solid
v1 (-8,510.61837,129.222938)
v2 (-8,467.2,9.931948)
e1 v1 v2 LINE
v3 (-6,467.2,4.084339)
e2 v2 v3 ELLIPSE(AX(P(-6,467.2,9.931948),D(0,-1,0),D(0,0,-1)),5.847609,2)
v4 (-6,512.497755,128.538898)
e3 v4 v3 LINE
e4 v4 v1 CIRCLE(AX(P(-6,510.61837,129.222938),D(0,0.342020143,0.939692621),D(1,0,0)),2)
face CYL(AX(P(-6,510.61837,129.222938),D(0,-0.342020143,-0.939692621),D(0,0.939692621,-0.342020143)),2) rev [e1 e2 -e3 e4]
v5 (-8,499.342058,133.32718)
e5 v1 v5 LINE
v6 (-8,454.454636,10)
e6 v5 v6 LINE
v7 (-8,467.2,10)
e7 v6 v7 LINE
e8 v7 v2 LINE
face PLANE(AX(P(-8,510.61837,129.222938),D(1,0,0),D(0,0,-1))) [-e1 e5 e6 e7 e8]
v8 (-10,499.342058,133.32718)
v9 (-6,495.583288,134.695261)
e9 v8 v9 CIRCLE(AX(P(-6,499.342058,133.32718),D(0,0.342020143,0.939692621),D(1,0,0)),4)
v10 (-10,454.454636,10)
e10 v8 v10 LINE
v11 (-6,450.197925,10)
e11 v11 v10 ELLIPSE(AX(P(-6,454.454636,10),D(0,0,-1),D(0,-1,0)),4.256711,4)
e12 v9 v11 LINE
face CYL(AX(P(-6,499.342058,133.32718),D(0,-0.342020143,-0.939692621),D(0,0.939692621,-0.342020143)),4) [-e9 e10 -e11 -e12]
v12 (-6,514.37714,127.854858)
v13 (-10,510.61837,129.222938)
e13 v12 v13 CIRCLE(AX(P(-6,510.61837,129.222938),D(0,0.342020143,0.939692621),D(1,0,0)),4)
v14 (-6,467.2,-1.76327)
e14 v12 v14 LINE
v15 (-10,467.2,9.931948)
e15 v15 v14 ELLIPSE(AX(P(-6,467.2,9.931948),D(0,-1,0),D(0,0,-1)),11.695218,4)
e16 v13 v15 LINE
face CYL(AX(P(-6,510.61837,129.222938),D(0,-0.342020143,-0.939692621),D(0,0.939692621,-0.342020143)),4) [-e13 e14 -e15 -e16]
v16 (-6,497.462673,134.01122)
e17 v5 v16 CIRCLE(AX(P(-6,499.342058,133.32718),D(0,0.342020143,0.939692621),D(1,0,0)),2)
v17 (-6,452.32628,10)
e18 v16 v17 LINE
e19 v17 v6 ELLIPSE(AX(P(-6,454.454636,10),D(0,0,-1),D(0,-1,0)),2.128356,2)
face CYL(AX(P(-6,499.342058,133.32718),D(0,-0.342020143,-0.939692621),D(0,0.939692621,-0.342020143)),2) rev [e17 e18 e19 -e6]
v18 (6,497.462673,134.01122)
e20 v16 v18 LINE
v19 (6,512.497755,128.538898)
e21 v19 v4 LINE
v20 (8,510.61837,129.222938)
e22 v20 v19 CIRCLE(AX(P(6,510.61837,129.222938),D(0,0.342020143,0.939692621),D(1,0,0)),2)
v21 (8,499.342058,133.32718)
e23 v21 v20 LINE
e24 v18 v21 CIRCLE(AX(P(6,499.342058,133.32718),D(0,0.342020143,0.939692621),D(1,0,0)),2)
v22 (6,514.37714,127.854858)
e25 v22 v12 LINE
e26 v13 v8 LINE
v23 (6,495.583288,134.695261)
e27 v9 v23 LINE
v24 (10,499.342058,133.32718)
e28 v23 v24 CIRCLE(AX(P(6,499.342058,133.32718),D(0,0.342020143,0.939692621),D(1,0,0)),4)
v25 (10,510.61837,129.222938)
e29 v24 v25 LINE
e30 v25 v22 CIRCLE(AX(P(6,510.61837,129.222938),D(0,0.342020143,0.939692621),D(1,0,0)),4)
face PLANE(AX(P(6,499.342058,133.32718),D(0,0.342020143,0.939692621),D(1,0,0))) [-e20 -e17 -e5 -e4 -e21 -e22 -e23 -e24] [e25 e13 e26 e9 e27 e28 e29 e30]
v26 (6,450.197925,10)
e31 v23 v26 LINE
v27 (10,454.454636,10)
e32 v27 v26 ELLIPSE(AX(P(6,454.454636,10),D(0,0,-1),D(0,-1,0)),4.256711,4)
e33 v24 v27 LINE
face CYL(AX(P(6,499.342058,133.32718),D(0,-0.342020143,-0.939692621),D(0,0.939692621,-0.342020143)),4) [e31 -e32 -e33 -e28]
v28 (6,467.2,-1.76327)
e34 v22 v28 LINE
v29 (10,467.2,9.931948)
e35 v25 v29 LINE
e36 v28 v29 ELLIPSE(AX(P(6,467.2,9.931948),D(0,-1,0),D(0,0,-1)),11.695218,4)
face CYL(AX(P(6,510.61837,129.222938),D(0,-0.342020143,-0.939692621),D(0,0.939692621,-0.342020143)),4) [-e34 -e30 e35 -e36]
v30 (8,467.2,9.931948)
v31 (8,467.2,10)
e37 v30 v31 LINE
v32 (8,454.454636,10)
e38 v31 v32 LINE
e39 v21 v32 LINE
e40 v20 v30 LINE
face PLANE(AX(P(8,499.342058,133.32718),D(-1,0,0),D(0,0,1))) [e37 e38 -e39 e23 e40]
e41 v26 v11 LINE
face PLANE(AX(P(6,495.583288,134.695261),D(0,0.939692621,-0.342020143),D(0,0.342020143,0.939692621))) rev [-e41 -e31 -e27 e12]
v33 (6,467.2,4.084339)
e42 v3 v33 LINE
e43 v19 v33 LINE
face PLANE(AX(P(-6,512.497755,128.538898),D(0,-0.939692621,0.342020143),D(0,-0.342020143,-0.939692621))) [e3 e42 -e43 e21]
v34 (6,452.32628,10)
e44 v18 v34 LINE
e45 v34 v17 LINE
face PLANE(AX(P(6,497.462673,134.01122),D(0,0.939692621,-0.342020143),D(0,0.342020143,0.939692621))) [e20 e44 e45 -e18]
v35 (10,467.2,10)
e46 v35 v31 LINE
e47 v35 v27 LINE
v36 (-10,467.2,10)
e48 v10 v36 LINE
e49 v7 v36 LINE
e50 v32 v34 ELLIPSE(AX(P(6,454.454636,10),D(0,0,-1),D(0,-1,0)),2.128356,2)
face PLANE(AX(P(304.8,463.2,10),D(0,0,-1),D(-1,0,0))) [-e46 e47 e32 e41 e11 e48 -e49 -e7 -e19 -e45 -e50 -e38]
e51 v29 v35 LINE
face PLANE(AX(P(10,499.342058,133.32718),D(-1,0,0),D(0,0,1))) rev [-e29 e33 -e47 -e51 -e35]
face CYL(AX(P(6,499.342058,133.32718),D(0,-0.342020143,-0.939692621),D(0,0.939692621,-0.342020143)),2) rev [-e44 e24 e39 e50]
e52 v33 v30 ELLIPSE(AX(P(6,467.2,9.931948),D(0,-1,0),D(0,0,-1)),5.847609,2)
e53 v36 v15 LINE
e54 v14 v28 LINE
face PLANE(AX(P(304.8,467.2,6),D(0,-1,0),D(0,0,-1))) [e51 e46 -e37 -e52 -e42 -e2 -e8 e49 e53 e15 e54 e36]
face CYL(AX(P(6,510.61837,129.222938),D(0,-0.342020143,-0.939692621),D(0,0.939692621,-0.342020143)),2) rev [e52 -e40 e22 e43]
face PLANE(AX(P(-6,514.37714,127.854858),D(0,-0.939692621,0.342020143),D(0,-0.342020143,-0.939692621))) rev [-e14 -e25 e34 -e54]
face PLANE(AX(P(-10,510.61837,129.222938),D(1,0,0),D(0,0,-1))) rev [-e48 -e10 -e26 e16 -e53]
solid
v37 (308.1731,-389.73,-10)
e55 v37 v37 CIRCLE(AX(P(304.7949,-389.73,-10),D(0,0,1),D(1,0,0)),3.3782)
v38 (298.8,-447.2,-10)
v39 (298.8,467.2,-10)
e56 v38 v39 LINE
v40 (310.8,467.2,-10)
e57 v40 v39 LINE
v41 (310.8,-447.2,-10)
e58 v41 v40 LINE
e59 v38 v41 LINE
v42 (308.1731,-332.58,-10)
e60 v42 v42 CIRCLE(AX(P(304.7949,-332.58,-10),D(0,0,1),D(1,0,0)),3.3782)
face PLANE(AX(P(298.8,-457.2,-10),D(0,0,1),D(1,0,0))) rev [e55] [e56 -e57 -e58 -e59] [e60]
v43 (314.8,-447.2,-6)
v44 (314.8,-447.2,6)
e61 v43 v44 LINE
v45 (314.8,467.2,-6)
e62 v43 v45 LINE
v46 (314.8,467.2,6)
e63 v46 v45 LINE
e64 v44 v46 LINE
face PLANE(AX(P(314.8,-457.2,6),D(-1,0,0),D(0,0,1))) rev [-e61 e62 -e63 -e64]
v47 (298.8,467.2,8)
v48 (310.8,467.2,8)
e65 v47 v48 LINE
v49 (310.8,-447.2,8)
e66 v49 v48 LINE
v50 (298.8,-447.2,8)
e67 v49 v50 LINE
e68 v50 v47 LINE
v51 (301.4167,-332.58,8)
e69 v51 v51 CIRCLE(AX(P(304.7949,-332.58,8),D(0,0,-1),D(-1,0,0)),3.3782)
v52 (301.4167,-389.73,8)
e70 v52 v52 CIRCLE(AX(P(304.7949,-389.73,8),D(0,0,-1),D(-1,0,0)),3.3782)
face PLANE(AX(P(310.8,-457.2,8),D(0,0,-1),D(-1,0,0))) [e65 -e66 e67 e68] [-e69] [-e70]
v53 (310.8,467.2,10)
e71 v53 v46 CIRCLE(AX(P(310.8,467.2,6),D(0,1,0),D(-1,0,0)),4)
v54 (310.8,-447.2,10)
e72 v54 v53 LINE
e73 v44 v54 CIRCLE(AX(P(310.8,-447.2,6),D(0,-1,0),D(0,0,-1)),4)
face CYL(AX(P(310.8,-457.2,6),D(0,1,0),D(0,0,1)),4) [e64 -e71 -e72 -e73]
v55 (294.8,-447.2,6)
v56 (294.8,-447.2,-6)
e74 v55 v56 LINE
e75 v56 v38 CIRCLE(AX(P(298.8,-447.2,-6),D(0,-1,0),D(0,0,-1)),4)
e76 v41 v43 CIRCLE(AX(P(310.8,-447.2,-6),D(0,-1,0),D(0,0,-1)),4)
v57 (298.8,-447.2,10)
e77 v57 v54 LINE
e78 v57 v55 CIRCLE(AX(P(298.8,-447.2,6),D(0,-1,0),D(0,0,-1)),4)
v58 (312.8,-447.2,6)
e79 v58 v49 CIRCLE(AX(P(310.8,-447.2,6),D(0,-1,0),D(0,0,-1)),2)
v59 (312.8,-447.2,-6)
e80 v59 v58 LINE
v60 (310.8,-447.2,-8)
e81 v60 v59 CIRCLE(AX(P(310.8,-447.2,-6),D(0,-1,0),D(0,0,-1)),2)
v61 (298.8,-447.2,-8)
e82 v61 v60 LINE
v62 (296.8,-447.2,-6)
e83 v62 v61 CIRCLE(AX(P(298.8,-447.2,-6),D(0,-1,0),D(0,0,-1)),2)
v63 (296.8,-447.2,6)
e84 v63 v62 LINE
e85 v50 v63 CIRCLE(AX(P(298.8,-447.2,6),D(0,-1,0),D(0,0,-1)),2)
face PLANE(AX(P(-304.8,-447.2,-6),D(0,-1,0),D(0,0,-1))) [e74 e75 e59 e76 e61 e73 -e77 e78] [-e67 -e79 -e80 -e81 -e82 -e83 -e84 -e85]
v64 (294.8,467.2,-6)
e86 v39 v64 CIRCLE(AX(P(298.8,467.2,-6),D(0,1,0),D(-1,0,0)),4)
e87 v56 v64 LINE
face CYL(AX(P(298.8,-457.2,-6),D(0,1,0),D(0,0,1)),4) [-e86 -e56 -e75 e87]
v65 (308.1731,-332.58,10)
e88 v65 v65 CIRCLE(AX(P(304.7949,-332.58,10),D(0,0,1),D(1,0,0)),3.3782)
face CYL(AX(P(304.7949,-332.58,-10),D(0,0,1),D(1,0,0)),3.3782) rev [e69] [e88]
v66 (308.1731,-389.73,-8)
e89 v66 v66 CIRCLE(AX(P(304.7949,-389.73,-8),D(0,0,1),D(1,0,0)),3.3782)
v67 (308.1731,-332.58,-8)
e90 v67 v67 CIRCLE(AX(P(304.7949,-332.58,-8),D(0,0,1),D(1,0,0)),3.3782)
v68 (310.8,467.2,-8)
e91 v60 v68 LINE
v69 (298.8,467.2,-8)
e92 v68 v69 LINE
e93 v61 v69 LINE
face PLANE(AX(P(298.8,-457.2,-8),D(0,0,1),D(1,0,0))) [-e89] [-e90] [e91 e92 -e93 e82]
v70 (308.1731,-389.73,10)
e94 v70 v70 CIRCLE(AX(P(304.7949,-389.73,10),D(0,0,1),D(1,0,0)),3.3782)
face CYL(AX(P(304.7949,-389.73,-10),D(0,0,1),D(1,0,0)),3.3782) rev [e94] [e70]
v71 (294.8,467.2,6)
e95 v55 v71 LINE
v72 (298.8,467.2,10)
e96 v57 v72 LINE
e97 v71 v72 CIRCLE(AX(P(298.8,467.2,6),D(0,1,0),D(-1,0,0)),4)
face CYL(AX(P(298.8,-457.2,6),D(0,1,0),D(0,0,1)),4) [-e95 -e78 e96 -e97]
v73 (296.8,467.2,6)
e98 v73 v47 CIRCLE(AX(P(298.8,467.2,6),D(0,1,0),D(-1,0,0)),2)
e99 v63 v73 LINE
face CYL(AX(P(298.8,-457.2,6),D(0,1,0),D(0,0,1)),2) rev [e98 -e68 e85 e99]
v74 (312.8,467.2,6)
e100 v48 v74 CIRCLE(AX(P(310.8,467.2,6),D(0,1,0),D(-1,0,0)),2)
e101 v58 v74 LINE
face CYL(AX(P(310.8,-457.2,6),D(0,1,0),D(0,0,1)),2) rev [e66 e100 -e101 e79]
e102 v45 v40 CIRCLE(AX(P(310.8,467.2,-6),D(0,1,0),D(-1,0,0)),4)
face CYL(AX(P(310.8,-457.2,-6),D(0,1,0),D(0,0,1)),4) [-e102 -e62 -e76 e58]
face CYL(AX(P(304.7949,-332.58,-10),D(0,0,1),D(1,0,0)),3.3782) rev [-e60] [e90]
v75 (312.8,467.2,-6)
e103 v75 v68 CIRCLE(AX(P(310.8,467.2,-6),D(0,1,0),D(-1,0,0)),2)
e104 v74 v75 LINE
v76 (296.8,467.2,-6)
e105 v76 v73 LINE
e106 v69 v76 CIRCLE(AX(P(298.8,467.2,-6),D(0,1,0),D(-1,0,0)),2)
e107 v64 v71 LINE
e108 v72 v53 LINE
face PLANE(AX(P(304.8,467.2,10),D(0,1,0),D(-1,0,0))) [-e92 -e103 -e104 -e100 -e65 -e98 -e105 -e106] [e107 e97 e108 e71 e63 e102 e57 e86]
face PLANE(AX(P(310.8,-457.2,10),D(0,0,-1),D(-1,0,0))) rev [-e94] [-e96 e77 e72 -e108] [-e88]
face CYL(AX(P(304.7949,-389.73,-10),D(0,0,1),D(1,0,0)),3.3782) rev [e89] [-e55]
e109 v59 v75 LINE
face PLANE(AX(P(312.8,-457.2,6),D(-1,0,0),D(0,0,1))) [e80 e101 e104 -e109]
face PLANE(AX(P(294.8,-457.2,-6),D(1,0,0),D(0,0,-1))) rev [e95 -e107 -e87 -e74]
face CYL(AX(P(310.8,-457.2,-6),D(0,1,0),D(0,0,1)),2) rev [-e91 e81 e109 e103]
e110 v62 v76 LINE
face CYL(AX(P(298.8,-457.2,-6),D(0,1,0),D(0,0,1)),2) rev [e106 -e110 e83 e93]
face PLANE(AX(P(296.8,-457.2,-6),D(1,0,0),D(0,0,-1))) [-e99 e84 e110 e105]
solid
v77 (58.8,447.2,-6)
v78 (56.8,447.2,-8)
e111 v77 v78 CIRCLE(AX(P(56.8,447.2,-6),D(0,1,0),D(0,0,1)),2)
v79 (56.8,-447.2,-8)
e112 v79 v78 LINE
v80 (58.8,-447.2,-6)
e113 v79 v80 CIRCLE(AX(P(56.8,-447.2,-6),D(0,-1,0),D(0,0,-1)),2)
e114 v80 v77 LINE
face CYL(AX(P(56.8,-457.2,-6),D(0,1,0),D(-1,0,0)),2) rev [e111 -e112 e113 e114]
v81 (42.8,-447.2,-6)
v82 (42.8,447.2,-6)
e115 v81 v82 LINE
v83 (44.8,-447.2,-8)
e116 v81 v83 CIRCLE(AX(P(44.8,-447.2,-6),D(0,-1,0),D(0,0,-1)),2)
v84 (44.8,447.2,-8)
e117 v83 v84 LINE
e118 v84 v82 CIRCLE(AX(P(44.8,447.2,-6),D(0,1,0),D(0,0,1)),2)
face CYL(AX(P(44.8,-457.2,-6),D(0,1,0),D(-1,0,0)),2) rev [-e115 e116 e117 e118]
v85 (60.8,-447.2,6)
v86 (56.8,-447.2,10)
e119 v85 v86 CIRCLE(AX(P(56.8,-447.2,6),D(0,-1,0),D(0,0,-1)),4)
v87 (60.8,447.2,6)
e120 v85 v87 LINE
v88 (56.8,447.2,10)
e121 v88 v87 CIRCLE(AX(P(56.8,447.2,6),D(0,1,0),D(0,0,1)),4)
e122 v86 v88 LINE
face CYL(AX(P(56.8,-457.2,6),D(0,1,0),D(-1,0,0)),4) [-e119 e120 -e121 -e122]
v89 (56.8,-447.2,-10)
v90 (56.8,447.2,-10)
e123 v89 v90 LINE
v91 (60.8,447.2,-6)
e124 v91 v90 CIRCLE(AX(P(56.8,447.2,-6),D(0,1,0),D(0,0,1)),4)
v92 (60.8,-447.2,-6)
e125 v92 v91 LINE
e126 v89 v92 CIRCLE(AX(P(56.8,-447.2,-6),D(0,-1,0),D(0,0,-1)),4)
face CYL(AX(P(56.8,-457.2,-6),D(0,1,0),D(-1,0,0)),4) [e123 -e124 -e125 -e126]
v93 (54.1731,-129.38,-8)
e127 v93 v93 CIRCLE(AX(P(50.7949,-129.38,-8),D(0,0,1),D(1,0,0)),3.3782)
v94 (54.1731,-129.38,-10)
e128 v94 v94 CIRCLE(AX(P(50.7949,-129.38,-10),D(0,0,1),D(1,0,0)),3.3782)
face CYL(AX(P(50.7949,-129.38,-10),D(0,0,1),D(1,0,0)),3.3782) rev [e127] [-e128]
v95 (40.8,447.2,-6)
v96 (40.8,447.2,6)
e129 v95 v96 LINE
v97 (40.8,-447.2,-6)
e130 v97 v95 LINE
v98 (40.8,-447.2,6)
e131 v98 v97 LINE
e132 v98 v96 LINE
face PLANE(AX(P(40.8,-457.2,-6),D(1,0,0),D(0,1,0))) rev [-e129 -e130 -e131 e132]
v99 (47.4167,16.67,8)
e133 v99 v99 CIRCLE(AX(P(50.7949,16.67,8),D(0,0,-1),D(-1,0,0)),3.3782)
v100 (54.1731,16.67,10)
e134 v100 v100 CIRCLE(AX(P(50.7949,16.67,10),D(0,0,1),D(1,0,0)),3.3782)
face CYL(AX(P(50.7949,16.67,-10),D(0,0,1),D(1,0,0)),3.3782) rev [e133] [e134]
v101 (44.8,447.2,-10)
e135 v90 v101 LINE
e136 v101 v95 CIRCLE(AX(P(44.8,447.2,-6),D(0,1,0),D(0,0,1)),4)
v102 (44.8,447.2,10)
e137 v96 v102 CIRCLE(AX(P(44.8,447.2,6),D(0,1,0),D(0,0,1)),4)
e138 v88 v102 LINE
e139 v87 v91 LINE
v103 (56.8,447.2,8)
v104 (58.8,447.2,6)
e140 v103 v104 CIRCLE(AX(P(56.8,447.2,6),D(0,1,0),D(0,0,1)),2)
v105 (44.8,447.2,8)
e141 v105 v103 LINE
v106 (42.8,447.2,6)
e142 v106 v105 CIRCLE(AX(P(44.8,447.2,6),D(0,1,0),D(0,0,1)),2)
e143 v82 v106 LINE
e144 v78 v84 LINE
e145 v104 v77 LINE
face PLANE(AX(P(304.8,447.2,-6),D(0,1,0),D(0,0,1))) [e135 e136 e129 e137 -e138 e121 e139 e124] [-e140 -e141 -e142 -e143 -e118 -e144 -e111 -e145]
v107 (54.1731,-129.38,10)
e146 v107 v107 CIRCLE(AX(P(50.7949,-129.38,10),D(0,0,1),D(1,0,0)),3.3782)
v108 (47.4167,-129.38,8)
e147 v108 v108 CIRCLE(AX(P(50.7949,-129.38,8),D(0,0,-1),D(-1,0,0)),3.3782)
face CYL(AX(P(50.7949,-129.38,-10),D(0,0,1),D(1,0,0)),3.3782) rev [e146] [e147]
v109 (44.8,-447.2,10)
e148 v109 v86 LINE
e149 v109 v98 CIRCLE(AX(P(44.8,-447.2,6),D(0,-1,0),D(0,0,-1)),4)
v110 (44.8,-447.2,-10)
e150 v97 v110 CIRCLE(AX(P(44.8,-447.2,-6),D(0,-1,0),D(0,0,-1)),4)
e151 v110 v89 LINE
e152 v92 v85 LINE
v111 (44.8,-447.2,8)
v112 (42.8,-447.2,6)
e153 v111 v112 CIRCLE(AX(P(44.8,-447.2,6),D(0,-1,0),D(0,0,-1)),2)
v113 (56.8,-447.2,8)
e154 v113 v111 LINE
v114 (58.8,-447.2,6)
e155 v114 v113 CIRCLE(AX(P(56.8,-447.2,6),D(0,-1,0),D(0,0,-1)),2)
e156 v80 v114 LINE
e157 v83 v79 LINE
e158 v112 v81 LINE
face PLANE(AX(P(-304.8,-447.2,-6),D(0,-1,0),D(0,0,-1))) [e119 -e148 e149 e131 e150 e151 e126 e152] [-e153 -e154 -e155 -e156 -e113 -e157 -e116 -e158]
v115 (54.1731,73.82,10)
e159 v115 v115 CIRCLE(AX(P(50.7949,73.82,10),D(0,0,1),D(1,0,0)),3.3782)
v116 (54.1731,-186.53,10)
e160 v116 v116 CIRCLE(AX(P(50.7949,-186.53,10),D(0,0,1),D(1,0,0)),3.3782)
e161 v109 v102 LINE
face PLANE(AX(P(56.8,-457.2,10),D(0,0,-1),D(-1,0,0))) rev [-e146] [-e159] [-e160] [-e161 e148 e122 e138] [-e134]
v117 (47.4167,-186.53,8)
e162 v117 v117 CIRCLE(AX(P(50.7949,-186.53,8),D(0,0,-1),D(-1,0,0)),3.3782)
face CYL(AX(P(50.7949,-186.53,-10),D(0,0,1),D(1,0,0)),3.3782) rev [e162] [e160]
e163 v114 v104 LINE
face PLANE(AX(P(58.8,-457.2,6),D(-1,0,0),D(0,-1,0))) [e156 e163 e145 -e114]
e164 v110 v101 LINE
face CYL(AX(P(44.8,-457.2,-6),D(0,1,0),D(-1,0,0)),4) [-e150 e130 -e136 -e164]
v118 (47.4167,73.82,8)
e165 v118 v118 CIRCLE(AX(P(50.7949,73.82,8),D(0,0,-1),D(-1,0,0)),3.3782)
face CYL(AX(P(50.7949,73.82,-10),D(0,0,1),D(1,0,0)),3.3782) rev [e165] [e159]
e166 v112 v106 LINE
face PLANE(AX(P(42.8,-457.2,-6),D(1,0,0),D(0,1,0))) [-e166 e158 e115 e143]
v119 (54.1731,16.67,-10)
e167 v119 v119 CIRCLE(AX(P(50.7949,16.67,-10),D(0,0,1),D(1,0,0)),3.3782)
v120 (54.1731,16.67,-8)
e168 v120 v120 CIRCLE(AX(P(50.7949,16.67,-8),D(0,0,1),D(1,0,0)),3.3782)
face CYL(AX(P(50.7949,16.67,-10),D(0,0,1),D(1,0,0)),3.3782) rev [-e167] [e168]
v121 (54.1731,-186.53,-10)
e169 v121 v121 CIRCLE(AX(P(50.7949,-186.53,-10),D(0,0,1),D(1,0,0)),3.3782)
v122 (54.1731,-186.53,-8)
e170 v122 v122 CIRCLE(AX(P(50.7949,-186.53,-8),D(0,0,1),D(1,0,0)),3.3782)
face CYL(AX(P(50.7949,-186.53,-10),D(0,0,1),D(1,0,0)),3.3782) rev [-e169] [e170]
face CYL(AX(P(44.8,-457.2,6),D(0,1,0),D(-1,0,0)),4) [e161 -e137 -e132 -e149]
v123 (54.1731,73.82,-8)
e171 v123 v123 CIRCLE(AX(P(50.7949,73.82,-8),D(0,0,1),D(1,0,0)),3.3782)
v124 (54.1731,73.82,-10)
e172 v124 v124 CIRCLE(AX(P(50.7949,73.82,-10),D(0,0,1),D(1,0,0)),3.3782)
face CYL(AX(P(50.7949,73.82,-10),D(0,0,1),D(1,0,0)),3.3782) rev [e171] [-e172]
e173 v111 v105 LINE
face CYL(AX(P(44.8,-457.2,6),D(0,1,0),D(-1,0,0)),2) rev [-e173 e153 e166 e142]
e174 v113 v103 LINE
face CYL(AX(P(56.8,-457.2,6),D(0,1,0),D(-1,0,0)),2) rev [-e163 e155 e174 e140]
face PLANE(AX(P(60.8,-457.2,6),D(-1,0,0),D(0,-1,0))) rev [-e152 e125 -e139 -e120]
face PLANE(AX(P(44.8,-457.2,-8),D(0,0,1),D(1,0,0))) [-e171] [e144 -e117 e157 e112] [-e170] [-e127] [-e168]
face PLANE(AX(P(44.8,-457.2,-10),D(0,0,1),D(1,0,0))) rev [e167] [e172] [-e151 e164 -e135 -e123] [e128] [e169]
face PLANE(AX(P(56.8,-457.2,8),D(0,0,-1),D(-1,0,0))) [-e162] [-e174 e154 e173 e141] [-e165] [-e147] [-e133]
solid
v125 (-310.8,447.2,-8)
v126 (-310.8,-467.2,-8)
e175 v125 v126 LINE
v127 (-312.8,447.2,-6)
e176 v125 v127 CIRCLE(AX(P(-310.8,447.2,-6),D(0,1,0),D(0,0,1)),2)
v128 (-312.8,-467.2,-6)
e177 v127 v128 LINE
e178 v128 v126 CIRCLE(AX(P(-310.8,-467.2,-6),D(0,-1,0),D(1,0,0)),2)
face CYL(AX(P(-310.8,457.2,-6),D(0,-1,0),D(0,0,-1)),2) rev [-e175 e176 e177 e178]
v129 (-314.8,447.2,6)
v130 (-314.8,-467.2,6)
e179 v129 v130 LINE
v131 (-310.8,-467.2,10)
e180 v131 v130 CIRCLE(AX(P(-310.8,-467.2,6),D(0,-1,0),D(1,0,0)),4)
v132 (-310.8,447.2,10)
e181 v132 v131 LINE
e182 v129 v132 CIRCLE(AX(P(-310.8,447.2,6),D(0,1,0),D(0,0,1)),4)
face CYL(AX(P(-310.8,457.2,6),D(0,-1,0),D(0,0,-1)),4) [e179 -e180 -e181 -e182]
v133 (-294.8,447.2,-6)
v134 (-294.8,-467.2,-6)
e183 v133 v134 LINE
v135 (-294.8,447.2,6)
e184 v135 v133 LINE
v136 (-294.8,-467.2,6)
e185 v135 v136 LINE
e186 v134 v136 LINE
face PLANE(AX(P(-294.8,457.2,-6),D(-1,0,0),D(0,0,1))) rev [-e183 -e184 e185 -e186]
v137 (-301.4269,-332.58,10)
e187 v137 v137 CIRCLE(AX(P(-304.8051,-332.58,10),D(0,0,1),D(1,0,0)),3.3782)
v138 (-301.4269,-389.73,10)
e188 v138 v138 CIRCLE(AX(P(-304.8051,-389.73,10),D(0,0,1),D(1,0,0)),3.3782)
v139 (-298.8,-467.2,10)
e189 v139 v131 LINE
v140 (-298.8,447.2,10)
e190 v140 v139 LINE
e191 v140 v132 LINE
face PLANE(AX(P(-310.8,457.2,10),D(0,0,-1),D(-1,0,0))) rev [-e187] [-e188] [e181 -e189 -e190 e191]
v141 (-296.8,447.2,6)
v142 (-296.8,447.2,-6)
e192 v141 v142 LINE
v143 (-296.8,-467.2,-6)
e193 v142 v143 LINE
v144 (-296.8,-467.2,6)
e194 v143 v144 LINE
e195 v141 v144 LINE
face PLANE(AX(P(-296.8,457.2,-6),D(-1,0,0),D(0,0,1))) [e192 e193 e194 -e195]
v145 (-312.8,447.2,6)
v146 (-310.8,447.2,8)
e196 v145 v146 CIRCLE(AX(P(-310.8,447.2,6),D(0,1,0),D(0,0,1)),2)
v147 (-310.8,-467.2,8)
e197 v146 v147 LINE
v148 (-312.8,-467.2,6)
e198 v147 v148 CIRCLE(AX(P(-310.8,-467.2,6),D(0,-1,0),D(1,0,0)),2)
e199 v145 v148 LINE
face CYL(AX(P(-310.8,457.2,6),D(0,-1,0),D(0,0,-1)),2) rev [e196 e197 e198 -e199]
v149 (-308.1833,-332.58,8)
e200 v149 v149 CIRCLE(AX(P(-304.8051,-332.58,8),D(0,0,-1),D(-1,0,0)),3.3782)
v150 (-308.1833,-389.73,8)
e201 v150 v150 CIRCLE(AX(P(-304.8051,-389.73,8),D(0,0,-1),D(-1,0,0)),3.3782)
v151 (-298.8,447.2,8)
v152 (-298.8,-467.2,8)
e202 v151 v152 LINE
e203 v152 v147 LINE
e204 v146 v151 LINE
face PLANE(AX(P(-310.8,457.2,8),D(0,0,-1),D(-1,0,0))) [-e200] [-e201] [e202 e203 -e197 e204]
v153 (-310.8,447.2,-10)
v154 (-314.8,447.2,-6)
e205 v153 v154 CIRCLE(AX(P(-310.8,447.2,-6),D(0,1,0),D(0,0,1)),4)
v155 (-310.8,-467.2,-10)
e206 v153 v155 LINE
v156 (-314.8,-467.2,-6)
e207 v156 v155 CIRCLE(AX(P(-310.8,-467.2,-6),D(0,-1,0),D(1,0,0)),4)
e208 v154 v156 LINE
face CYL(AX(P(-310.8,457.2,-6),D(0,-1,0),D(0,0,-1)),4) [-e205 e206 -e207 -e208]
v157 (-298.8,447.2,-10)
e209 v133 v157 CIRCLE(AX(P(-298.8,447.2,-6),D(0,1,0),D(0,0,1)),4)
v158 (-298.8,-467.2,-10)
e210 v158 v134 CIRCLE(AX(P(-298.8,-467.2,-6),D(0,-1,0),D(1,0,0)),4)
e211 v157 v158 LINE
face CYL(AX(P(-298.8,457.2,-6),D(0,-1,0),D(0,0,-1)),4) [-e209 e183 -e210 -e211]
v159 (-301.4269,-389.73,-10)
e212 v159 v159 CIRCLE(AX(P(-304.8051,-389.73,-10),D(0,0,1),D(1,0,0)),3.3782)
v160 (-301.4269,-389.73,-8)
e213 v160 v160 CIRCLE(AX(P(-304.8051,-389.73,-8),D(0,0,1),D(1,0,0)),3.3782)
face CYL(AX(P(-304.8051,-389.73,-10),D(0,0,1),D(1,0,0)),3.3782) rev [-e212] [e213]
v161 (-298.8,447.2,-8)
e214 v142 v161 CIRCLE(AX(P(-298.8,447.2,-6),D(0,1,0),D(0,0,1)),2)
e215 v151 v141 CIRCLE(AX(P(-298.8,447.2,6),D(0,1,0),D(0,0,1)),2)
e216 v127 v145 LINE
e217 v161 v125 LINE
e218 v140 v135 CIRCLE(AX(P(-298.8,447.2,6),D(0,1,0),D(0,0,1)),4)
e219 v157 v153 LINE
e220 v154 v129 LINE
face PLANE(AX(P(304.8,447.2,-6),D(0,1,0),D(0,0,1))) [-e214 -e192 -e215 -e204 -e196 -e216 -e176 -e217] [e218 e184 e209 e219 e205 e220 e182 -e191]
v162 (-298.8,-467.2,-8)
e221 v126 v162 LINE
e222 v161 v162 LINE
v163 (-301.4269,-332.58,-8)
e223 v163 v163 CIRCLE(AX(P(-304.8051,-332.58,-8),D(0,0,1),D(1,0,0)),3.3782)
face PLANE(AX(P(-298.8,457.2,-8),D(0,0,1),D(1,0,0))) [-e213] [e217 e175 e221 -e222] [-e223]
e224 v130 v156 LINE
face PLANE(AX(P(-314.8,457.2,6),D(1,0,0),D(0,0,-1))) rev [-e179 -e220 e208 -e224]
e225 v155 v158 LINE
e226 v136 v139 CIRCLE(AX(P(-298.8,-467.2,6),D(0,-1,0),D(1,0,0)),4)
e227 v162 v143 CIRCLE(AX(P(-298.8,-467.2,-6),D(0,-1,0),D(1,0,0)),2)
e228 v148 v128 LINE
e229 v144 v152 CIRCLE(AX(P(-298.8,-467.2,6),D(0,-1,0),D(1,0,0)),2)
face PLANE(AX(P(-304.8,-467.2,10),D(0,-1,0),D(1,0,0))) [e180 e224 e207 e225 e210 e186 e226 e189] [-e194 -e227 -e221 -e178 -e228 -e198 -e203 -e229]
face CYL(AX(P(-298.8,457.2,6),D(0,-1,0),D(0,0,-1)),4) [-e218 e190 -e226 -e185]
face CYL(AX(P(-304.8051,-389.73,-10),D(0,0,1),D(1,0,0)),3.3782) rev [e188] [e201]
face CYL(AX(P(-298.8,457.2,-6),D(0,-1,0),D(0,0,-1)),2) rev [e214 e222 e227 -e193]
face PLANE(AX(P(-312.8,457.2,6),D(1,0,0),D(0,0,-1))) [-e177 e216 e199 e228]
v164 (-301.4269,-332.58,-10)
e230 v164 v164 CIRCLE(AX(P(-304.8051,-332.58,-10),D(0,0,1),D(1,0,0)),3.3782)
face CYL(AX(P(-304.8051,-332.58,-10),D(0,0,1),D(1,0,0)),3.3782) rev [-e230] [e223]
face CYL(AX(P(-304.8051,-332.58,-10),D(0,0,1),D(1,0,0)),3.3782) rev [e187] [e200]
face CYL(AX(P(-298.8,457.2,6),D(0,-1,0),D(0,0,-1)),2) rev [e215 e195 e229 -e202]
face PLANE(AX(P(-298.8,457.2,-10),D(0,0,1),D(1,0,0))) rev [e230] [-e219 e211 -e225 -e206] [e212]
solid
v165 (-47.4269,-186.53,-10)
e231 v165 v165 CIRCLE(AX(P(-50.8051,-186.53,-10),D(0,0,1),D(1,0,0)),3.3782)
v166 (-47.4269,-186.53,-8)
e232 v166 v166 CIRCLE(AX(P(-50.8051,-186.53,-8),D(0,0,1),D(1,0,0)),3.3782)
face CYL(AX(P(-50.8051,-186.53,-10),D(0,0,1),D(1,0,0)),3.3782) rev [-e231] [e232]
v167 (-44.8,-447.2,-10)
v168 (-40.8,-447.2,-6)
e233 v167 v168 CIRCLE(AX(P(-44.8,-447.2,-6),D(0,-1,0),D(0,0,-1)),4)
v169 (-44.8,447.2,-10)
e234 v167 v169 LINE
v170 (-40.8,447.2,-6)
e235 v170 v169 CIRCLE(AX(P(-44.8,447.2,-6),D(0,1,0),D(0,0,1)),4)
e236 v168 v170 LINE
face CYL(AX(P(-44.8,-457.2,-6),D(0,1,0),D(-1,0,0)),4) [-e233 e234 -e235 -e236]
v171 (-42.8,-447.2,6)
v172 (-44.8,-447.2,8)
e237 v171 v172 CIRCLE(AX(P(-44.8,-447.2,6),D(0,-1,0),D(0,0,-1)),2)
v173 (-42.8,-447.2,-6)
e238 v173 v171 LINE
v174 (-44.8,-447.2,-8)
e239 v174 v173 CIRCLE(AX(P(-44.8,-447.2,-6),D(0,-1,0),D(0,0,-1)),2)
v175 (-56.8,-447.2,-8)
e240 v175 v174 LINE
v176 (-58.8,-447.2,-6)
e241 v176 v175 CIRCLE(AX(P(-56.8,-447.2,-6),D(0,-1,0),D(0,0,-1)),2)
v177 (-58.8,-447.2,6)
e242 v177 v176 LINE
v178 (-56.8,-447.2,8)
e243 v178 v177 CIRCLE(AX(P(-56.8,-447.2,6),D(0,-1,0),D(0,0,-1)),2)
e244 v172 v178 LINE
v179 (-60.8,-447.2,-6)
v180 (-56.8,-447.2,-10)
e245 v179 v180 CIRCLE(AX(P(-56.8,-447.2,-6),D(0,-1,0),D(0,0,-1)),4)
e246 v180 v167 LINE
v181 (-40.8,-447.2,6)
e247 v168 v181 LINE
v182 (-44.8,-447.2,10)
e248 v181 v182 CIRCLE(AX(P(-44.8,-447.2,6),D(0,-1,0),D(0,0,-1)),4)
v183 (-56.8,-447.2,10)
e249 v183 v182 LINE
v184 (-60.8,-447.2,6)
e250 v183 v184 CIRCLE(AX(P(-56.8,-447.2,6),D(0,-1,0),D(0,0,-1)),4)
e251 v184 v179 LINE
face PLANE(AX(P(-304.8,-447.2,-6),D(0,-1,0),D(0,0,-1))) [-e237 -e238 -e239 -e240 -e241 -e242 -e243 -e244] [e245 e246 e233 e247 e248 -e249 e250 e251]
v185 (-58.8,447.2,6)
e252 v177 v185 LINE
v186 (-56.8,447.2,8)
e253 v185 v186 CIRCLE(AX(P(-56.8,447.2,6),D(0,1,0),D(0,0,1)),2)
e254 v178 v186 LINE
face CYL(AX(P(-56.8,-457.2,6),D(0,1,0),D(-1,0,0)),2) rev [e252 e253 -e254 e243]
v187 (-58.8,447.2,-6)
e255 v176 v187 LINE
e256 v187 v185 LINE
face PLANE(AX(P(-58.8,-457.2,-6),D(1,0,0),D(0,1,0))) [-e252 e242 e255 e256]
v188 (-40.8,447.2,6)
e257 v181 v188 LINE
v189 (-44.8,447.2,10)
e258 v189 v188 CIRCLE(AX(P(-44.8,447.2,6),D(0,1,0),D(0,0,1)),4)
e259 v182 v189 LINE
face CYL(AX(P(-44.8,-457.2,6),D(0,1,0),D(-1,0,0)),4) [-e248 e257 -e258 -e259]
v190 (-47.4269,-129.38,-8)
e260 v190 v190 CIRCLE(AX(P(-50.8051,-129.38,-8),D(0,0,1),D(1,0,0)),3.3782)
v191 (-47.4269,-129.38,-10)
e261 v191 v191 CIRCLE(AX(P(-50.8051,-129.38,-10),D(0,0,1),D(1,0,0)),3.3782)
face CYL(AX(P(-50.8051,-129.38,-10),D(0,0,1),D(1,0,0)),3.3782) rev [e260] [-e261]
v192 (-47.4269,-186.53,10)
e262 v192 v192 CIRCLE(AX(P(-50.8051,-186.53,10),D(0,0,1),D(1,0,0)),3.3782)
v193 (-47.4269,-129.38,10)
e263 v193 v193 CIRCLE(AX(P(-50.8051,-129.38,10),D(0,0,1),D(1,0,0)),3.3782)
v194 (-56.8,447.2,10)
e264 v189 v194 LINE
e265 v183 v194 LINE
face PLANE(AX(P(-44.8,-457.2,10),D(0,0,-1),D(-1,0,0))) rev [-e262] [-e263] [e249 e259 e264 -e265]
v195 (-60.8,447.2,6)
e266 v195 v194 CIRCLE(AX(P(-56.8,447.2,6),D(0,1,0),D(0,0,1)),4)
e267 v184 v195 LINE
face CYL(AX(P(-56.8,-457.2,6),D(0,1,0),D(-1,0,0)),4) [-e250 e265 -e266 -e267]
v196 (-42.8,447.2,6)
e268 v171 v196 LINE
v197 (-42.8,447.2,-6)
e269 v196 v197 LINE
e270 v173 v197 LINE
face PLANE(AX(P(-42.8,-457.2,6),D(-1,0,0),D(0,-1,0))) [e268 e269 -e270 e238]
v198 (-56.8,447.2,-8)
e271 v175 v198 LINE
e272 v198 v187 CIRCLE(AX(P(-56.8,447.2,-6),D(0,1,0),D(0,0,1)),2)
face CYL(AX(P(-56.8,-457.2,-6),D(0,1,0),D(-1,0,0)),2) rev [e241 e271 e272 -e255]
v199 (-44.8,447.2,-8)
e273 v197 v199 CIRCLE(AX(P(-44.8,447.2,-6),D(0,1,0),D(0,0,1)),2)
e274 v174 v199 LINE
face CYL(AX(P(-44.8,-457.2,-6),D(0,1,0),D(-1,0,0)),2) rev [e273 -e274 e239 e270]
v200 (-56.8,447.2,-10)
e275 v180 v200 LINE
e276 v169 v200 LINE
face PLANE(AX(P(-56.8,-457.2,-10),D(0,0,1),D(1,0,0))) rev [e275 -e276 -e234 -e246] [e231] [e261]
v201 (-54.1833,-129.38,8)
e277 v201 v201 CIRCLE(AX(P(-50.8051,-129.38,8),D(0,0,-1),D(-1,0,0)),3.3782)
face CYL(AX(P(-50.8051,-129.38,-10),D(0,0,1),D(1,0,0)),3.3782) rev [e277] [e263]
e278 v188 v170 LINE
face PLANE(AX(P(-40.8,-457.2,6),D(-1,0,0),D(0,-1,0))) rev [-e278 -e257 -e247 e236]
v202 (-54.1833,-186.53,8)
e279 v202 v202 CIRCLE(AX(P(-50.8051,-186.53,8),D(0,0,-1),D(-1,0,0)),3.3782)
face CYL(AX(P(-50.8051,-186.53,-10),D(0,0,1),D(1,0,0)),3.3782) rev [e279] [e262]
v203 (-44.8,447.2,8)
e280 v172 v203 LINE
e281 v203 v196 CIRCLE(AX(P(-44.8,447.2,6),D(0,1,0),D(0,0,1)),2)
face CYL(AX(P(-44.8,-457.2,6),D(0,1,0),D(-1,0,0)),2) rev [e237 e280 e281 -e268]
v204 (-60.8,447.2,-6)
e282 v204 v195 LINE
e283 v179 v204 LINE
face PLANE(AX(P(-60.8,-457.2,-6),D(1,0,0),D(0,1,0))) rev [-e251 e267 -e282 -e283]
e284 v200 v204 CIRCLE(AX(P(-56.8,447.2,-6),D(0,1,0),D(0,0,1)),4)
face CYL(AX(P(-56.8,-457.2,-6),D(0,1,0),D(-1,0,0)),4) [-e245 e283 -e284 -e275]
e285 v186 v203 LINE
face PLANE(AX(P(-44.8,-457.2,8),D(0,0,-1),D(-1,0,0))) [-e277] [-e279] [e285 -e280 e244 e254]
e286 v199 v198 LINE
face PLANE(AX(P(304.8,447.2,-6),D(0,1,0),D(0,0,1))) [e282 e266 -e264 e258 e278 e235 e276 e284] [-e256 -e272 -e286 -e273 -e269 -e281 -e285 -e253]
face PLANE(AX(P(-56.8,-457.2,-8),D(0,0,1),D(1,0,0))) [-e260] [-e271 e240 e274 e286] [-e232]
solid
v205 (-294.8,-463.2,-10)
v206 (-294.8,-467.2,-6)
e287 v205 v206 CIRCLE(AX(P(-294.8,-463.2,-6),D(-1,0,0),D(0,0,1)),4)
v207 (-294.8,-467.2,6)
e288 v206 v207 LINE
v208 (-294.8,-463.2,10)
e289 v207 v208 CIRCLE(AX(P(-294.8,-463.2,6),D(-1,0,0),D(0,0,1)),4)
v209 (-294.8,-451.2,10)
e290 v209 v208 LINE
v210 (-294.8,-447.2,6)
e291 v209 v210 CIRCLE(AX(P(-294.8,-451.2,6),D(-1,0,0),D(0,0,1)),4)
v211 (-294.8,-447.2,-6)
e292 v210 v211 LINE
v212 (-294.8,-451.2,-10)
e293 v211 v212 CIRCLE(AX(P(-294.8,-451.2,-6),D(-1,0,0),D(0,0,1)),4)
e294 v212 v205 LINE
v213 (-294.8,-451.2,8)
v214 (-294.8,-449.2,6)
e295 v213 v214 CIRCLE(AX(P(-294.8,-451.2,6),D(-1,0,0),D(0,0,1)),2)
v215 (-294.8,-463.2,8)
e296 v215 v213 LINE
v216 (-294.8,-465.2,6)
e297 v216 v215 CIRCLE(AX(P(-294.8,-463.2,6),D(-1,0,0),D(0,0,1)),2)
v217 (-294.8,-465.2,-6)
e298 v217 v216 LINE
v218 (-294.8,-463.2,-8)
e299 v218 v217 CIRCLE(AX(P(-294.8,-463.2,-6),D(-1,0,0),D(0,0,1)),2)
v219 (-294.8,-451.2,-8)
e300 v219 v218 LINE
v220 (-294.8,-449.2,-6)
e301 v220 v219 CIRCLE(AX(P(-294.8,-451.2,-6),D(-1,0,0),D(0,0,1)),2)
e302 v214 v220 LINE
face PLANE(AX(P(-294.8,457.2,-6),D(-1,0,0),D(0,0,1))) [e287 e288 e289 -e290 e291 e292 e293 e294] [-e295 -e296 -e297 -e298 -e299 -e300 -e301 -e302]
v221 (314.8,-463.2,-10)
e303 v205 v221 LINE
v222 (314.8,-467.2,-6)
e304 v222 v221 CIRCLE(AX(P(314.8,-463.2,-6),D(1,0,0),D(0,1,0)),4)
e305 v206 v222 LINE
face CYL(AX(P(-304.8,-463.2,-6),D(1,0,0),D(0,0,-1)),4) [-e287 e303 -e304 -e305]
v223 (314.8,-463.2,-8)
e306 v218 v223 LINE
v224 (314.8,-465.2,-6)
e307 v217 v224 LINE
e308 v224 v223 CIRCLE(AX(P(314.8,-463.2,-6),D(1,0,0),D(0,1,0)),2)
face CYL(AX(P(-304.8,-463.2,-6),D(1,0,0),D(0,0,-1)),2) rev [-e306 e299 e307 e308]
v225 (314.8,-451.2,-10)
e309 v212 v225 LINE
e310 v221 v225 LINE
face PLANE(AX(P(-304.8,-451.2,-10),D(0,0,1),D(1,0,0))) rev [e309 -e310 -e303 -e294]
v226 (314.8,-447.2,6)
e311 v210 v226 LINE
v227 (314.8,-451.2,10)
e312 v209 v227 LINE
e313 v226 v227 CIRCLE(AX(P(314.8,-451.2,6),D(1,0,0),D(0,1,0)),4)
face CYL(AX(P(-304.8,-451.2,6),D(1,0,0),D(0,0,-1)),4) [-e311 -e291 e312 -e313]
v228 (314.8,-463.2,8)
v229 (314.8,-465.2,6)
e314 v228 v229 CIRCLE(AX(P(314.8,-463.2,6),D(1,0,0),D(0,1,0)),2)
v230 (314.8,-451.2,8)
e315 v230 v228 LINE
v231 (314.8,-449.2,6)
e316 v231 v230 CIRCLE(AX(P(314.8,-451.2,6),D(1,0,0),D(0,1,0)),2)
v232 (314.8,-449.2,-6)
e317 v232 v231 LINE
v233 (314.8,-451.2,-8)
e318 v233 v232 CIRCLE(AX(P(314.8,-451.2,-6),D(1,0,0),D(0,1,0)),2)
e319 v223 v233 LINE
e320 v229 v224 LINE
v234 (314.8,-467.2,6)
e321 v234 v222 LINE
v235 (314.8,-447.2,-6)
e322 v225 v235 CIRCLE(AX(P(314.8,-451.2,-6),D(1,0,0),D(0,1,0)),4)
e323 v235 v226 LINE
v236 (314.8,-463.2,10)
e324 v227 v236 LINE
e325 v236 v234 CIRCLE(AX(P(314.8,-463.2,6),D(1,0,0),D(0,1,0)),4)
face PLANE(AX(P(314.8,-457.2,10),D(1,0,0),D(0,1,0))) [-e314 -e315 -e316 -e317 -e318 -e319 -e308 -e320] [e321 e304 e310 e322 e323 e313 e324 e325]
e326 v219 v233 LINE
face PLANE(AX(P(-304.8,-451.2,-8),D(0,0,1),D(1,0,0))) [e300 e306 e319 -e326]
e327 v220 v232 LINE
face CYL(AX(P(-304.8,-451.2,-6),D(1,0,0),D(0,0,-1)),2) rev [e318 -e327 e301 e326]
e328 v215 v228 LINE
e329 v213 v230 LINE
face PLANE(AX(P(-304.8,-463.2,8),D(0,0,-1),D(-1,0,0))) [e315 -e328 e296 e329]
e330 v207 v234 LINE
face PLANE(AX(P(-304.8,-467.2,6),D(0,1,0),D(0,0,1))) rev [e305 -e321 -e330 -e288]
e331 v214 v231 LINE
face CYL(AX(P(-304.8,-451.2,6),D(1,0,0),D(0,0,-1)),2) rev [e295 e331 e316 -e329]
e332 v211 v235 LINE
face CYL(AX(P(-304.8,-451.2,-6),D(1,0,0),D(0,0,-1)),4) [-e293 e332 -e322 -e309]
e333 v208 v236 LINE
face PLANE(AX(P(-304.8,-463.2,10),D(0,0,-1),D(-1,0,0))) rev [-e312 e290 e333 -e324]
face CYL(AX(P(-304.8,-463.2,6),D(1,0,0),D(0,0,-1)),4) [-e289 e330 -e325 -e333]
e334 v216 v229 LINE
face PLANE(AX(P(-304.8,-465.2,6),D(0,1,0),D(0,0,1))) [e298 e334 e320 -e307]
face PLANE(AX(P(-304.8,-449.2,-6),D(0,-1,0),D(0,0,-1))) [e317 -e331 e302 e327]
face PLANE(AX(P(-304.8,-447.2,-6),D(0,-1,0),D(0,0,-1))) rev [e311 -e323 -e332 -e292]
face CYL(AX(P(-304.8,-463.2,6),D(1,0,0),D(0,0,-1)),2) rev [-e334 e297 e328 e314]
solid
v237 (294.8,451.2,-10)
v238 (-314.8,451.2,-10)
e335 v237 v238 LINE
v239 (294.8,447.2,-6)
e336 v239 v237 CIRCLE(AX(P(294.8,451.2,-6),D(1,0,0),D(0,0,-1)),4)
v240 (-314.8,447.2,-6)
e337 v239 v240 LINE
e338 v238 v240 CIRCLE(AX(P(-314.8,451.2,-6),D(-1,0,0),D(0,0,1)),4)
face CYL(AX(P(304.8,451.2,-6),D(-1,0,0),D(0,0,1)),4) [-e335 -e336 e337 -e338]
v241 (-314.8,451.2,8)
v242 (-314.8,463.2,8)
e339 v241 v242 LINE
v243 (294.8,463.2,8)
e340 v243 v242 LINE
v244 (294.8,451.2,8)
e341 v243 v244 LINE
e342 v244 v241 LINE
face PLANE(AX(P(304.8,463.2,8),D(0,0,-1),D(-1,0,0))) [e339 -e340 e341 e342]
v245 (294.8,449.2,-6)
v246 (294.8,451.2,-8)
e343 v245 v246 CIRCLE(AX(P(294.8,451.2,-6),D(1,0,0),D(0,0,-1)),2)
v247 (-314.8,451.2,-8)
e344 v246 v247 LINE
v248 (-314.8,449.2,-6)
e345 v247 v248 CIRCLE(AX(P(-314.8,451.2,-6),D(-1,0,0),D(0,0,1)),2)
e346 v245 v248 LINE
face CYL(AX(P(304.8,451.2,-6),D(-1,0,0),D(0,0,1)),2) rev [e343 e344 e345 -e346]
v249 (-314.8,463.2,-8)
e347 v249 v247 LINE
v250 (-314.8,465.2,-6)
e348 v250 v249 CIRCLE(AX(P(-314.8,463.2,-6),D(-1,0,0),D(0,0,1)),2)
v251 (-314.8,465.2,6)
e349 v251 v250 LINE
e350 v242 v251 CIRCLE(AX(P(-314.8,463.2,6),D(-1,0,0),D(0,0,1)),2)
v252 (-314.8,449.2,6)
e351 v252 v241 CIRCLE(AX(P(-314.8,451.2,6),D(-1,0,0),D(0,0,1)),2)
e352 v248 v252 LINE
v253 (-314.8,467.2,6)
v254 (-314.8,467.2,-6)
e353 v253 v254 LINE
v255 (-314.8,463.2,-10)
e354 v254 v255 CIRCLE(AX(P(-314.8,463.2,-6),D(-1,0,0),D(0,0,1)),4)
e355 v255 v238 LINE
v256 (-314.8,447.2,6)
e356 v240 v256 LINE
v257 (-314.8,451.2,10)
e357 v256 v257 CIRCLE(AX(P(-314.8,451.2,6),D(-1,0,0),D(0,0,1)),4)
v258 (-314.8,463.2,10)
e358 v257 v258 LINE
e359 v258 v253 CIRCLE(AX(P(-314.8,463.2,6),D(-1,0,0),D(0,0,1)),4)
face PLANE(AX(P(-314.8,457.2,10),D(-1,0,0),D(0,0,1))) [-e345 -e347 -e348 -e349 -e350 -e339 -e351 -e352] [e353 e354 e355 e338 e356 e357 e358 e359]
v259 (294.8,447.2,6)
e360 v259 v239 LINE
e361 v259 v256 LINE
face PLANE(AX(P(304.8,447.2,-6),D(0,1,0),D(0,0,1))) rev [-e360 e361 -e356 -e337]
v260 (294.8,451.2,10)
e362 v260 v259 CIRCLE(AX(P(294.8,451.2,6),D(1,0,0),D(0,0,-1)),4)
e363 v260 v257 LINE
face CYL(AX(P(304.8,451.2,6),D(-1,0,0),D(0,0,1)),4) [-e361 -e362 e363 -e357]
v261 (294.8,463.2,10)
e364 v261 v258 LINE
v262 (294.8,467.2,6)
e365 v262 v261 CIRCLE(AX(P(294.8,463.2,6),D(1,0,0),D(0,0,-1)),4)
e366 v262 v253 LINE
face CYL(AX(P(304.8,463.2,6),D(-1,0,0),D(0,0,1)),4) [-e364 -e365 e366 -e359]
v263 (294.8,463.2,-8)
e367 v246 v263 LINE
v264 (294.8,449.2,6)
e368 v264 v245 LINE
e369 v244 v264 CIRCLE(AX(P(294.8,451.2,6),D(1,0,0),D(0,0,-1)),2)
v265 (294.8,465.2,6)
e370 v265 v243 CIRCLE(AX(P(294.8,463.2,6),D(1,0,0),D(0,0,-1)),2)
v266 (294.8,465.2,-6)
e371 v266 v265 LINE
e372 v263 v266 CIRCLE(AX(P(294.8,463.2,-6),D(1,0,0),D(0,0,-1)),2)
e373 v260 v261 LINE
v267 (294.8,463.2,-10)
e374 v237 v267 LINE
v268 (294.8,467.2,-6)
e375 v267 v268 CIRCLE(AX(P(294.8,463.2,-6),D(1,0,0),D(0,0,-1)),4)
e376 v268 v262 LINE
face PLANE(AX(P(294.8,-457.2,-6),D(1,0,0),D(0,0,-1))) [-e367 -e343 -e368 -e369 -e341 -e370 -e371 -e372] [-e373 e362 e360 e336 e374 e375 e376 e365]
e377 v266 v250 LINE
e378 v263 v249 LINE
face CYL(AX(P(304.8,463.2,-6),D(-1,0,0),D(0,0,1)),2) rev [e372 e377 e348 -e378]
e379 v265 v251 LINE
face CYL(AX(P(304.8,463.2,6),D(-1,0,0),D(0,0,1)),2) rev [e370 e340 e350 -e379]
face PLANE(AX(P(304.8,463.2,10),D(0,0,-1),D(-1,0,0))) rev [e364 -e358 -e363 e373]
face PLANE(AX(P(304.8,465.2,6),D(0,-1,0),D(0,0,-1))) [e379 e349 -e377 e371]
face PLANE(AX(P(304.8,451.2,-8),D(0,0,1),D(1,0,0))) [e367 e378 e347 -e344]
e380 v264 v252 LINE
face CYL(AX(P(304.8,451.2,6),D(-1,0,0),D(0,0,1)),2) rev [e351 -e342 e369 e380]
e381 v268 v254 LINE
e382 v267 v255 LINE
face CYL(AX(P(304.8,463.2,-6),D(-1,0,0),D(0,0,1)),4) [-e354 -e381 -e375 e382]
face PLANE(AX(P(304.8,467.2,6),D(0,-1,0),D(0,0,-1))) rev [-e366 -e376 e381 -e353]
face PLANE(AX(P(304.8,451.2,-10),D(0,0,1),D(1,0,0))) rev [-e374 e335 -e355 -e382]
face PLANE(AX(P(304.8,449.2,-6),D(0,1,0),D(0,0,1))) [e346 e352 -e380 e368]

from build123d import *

# Parameters (mm, degrees)
SQUARE_START                          = -467.2
SQUARE_TUBE_20_X_20_X_2_1_DEPTH       = 914.4
SQUARE_START_2                        = -294.8
SQUARE_TUBE_20_X_20_X_2_1_2_DEPTH     = 609.6
SQUARE_START_3                        = -314.8
SQUARE_TUBE_20_X_20_X_2_1_3_DEPTH     = 609.6
SQUARE_START_4                        = -447.2
SQUARE_TUBE_20_X_20_X_2_1_4_DEPTH     = 914.4
SQUARE_TUBE_20_X_20_X_2_1_5_DEPTH     = 894.4
SQUARE_TUBE_20_X_20_X_2_1_6_DEPTH     = 894.4
SQUARE_START_5                        = 158.134879336
SQUARE_TUBE_20_X_20_X_2_1_7_DEPTH     = 137.936730192
SQUARE_START_6                        = 447
SQUARE_TUBE_20_X_20_X_2_1_8_OUTLINE_W = 24
SQUARE_TUBE_20_X_20_X_2_1_8_OUTLINE_H = 13
SQUARE_TUBE_20_X_20_X_2_1_8_DEPTH     = 20.2
SKETCH12_R                            = 3.3782
CUT_EXTRUDE2_DEPTH                    = 616.817984795
SKETCH13_R                            = 3.3782
CUT_EXTRUDE3_DEPTH                    = 616.817984795
SKETCH14_R                            = 3.3782
CUT_EXTRUDE4_DEPTH                    = 616.817984795


with BuildPart() as part:
    # Square tube 20 X 20 X 2(1): read off the stored shape, not the designer's step
    # Square tube 20 X 20 X 2(1) outline → Square tube 20 X 20 X 2(1) (new body)
    with BuildSketch(Plane(origin=(0, 0, 0), x_dir=(1, 0, 0), z_dir=(0, 1, 0)).offset(SQUARE_START)):
        with BuildLine():
            Line((-314.8, 6), (-314.8, -6))
            ThreePointArc((-314.8, -6), (-313.628427125, -8.828427125), (-310.8, -10))
            Line((-310.8, -10), (-298.8, -10))
            ThreePointArc((-298.8, -10), (-295.971572875, -8.828427125), (-294.8, -6))
            Line((-294.8, -6), (-294.8, 6))
            ThreePointArc((-294.8, 6), (-295.971572875, 8.828427125), (-298.8, 10))
            Line((-298.8, 10), (-310.8, 10))
            ThreePointArc((-310.8, 10), (-313.628427125, 8.828427125), (-314.8, 6))
        make_face()
        with BuildLine():
            ThreePointArc((-298.8, 8), (-297.385786438, 7.414213562), (-296.8, 6))
            Line((-296.8, 6), (-296.8, -6))
            ThreePointArc((-296.8, -6), (-297.385786438, -7.414213562), (-298.8, -8))
            Line((-298.8, -8), (-310.8, -8))
            ThreePointArc((-310.8, -8), (-312.214213562, -7.414213562), (-312.8, -6))
            Line((-312.8, -6), (-312.8, 6))
            ThreePointArc((-312.8, 6), (-312.214213562, 7.414213562), (-310.8, 8))
            Line((-310.8, 8), (-298.8, 8))
        make_face(mode=Mode.SUBTRACT)
    extrude(amount=SQUARE_TUBE_20_X_20_X_2_1_DEPTH)

    # Sketch12 → Cut-Extrude2 (cut, through all)
    with BuildSketch(Plane.XY.offset(10)):
        with Locations((-304.8051, -332.58)):
            Circle(SKETCH12_R)
    extrude(amount=-CUT_EXTRUDE2_DEPTH, mode=Mode.SUBTRACT)

    # Sketch13 → Cut-Extrude3 (cut, through all)
    with BuildSketch(Plane.XY.offset(10)):
        with Locations((-304.8051, -389.73)):
            Circle(SKETCH13_R)
    extrude(amount=-CUT_EXTRUDE3_DEPTH, mode=Mode.SUBTRACT)


with BuildPart() as body_2:
    # Square tube 20 X 20 X 2_1 2 outline → Square tube 20 X 20 X 2_1 2 (new body)
    with BuildSketch(Plane.YZ.offset(SQUARE_START_2)):
        with BuildLine():
            Line((-467.2, 6), (-467.2, -6))
            ThreePointArc((-467.2, -6), (-466.028427125, -8.828427125), (-463.2, -10))
            Line((-463.2, -10), (-451.2, -10))
            ThreePointArc((-451.2, -10), (-448.371572875, -8.828427125), (-447.2, -6))
            Line((-447.2, -6), (-447.2, 6))
            ThreePointArc((-447.2, 6), (-448.371572875, 8.828427125), (-451.2, 10))
            Line((-451.2, 10), (-463.2, 10))
            ThreePointArc((-463.2, 10), (-466.028427125, 8.828427125), (-467.2, 6))
        make_face()
        with BuildLine():
            ThreePointArc((-451.2, 8), (-449.785786438, 7.414213562), (-449.2, 6))
            Line((-449.2, 6), (-449.2, -6))
            ThreePointArc((-449.2, -6), (-449.785786438, -7.414213562), (-451.2, -8))
            Line((-451.2, -8), (-463.2, -8))
            ThreePointArc((-463.2, -8), (-464.614213562, -7.414213562), (-465.2, -6))
            Line((-465.2, -6), (-465.2, 6))
            ThreePointArc((-465.2, 6), (-464.614213562, 7.414213562), (-463.2, 8))
            Line((-463.2, 8), (-451.2, 8))
        make_face(mode=Mode.SUBTRACT)
    extrude(amount=SQUARE_TUBE_20_X_20_X_2_1_2_DEPTH)


with BuildPart() as body_3:
    # Square tube 20 X 20 X 2_1 3 outline → Square tube 20 X 20 X 2_1 3 (new body)
    with BuildSketch(Plane.YZ.offset(SQUARE_START_3)):
        with BuildLine():
            Line((467.2, -6), (467.2, 6))
            ThreePointArc((467.2, 6), (466.028427125, 8.828427125), (463.2, 10))
            Line((463.2, 10), (451.2, 10))
            ThreePointArc((451.2, 10), (448.371572875, 8.828427125), (447.2, 6))
            Line((447.2, 6), (447.2, -6))
            ThreePointArc((447.2, -6), (448.371572875, -8.828427125), (451.2, -10))
            Line((451.2, -10), (463.2, -10))
            ThreePointArc((463.2, -10), (466.028427125, -8.828427125), (467.2, -6))
        make_face()
        with BuildLine():
            ThreePointArc((451.2, -8), (449.785786438, -7.414213562), (449.2, -6))
            Line((449.2, -6), (449.2, 6))
            ThreePointArc((449.2, 6), (449.785786438, 7.414213562), (451.2, 8))
            Line((451.2, 8), (463.2, 8))
            ThreePointArc((463.2, 8), (464.614213562, 7.414213562), (465.2, 6))
            Line((465.2, 6), (465.2, -6))
            ThreePointArc((465.2, -6), (464.614213562, -7.414213562), (463.2, -8))
            Line((463.2, -8), (451.2, -8))
        make_face(mode=Mode.SUBTRACT)
    extrude(amount=SQUARE_TUBE_20_X_20_X_2_1_3_DEPTH)


with BuildPart() as body_4:
    # Square tube 20 X 20 X 2_1 4 outline → Square tube 20 X 20 X 2_1 4 (new body)
    with BuildSketch(Plane(origin=(0, 0, 0), x_dir=(1, 0, 0), z_dir=(0, 1, 0)).offset(SQUARE_START_4)):
        with BuildLine():
            Line((314.8, -6), (314.8, 6))
            ThreePointArc((314.8, 6), (313.628427125, 8.828427125), (310.8, 10))
            Line((310.8, 10), (298.8, 10))
            ThreePointArc((298.8, 10), (295.971572875, 8.828427125), (294.8, 6))
            Line((294.8, 6), (294.8, -6))
            ThreePointArc((294.8, -6), (295.971572875, -8.828427125), (298.8, -10))
            Line((298.8, -10), (310.8, -10))
            ThreePointArc((310.8, -10), (313.628427125, -8.828427125), (314.8, -6))
        make_face()
        with BuildLine():
            ThreePointArc((298.8, -8), (297.385786438, -7.414213562), (296.8, -6))
            Line((296.8, -6), (296.8, 6))
            ThreePointArc((296.8, 6), (297.385786438, 7.414213562), (298.8, 8))
            Line((298.8, 8), (310.8, 8))
            ThreePointArc((310.8, 8), (312.214213562, 7.414213562), (312.8, 6))
            Line((312.8, 6), (312.8, -6))
            ThreePointArc((312.8, -6), (312.214213562, -7.414213562), (310.8, -8))
            Line((310.8, -8), (298.8, -8))
        make_face(mode=Mode.SUBTRACT)
    extrude(amount=SQUARE_TUBE_20_X_20_X_2_1_4_DEPTH)


with BuildPart() as body_5:
    # Square tube 20 X 20 X 2_1 5 outline → Square tube 20 X 20 X 2_1 5 (new body)
    with BuildSketch(Plane(origin=(0, 0, 0), x_dir=(1, 0, 0), z_dir=(0, 1, 0)).offset(SQUARE_START_4)):
        with BuildLine():
            Line((44.8, -10), (56.8, -10))
            ThreePointArc((56.8, -10), (59.628427125, -8.828427125), (60.8, -6))
            Line((60.8, -6), (60.8, 6))
            ThreePointArc((60.8, 6), (59.628427125, 8.828427125), (56.8, 10))
            Line((56.8, 10), (44.8, 10))
            ThreePointArc((44.8, 10), (41.971572875, 8.828427125), (40.8, 6))
            Line((40.8, 6), (40.8, -6))
            ThreePointArc((40.8, -6), (41.971572875, -8.828427125), (44.8, -10))
        make_face()
        with BuildLine():
            ThreePointArc((44.8, -8), (43.385786438, -7.414213562), (42.8, -6))
            Line((42.8, -6), (42.8, 6))
            ThreePointArc((42.8, 6), (43.385786438, 7.414213562), (44.8, 8))
            Line((44.8, 8), (56.8, 8))
            ThreePointArc((56.8, 8), (58.214213562, 7.414213562), (58.8, 6))
            Line((58.8, 6), (58.8, -6))
            ThreePointArc((58.8, -6), (58.214213562, -7.414213562), (56.8, -8))
            Line((56.8, -8), (44.8, -8))
        make_face(mode=Mode.SUBTRACT)
    extrude(amount=SQUARE_TUBE_20_X_20_X_2_1_5_DEPTH)


with BuildPart() as body_6:
    # Square tube 20 X 20 X 2_1 6 outline → Square tube 20 X 20 X 2_1 6 (new body)
    with BuildSketch(Plane(origin=(0, 0, 0), x_dir=(1, 0, 0), z_dir=(0, 1, 0)).offset(SQUARE_START_4)):
        with BuildLine():
            Line((-56.8, -10), (-44.8, -10))
            ThreePointArc((-44.8, -10), (-41.971572875, -8.828427125), (-40.8, -6))
            Line((-40.8, -6), (-40.8, 6))
            ThreePointArc((-40.8, 6), (-41.971572875, 8.828427125), (-44.8, 10))
            Line((-44.8, 10), (-56.8, 10))
            ThreePointArc((-56.8, 10), (-59.628427125, 8.828427125), (-60.8, 6))
            Line((-60.8, 6), (-60.8, -6))
            ThreePointArc((-60.8, -6), (-59.628427125, -8.828427125), (-56.8, -10))
        make_face()
        with BuildLine():
            ThreePointArc((-56.8, -8), (-58.214213562, -7.414213562), (-58.8, -6))
            Line((-58.8, -6), (-58.8, 6))
            ThreePointArc((-58.8, 6), (-58.214213562, 7.414213562), (-56.8, 8))
            Line((-56.8, 8), (-44.8, 8))
            ThreePointArc((-44.8, 8), (-43.385786438, 7.414213562), (-42.8, 6))
            Line((-42.8, 6), (-42.8, -6))
            ThreePointArc((-42.8, -6), (-43.385786438, -7.414213562), (-44.8, -8))
            Line((-44.8, -8), (-56.8, -8))
        make_face(mode=Mode.SUBTRACT)
    extrude(amount=SQUARE_TUBE_20_X_20_X_2_1_6_DEPTH)


with BuildPart() as body_7:
    # Square tube 20 X 20 X 2_1 7 outline → Square tube 20 X 20 X 2_1 7 (new body)
    with BuildSketch(Plane(origin=(0, 0, 0), x_dir=(1, 0, 0), z_dir=(0, 0.342020143325673, 0.939692620785907)).offset(SQUARE_START_5)):
        with BuildLine():
            ThreePointArc((6, 419.627466223), (8.828427124, 420.799039099), (10, 423.627466223))
            Line((10, 423.627466223), (10, 435.627466223))
            ThreePointArc((10, 435.627466223), (8.828427125, 438.455893348), (6, 439.627466223))
            Line((6, 439.627466223), (-6, 439.627466223))
            ThreePointArc((-6, 439.627466223), (-8.828427125, 438.455893348), (-10, 435.627466223))
            Line((-10, 435.627466223), (-10, 423.627466223))
            ThreePointArc((-10, 423.627466223), (-8.828427124, 420.799039099), (-6, 419.627466223))
            Line((-6, 419.627466223), (6, 419.627466223))
        make_face()
        with BuildLine():
            Line((-6, 437.627466223), (6, 437.627466223))
            ThreePointArc((6, 437.627466223), (7.414213562, 437.041679785), (8, 435.627466223))
            Line((8, 435.627466223), (8, 423.627466223))
            ThreePointArc((8, 423.627466223), (7.414213562, 422.213252661), (6, 421.627466223))
            Line((6, 421.627466223), (-6, 421.627466223))
            ThreePointArc((-6, 421.627466223), (-7.414213562, 422.213252661), (-8, 423.627466223))
            Line((-8, 423.627466223), (-8, 435.627466223))
            ThreePointArc((-8, 435.627466223), (-7.414213562, 437.041679785), (-6, 437.627466223))
        make_face(mode=Mode.SUBTRACT)
    extrude(amount=SQUARE_TUBE_20_X_20_X_2_1_7_DEPTH)

    # Square tube 20 X 20 X 2_1 8 outline → Square tube 20 X 20 X 2_1 8 (cut)
    with BuildSketch(Plane(origin=(0, 0, 0), x_dir=(1, 0, 0), z_dir=(0, 1, 0)).offset(SQUARE_START_6)):
        with Locations((0, -3.5)):
            Rectangle(SQUARE_TUBE_20_X_20_X_2_1_8_OUTLINE_W, SQUARE_TUBE_20_X_20_X_2_1_8_OUTLINE_H)
    extrude(amount=SQUARE_TUBE_20_X_20_X_2_1_8_DEPTH, mode=Mode.SUBTRACT)


with BuildPart() as cut_extrude4_tool:
    # Sketch14 → Cut-Extrude4 (new, through all)
    with BuildSketch(Plane.XY.offset(10)):
        with Locations((304.7949, -332.58)):
            Circle(SKETCH14_R)
        with Locations((304.7949, -389.73)):
            Circle(SKETCH14_R)
        with Locations((-50.8051, -186.53)):
            Circle(SKETCH14_R)
        with Locations((-50.8051, -129.38)):
            Circle(SKETCH14_R)
        with Locations((50.7949, -129.38)):
            Circle(SKETCH14_R)
        with Locations((50.7949, -186.53)):
            Circle(SKETCH14_R)
        with Locations((50.7949, 73.82)):
            Circle(SKETCH14_R)
        with Locations((50.7949, 16.67)):
            Circle(SKETCH14_R)
    extrude(amount=-CUT_EXTRUDE4_DEPTH)


with BuildPart() as body_4_1:
    add(body_4.part)

    # Cut-Extrude4: cut by cut_extrude4_tool
    add(cut_extrude4_tool.part, mode=Mode.SUBTRACT)


with BuildPart() as body_5_1:
    add(body_5.part)

    # Cut-Extrude4: cut by cut_extrude4_tool
    add(cut_extrude4_tool.part, mode=Mode.SUBTRACT)


with BuildPart() as body_6_1:
    add(body_6.part)

    # Cut-Extrude4: cut by cut_extrude4_tool
    add(cut_extrude4_tool.part, mode=Mode.SUBTRACT)


solid = Compound([part.part, body_2.part, body_3.part, body_7.part, body_4_1.part, body_5_1.part, body_6_1.part])
